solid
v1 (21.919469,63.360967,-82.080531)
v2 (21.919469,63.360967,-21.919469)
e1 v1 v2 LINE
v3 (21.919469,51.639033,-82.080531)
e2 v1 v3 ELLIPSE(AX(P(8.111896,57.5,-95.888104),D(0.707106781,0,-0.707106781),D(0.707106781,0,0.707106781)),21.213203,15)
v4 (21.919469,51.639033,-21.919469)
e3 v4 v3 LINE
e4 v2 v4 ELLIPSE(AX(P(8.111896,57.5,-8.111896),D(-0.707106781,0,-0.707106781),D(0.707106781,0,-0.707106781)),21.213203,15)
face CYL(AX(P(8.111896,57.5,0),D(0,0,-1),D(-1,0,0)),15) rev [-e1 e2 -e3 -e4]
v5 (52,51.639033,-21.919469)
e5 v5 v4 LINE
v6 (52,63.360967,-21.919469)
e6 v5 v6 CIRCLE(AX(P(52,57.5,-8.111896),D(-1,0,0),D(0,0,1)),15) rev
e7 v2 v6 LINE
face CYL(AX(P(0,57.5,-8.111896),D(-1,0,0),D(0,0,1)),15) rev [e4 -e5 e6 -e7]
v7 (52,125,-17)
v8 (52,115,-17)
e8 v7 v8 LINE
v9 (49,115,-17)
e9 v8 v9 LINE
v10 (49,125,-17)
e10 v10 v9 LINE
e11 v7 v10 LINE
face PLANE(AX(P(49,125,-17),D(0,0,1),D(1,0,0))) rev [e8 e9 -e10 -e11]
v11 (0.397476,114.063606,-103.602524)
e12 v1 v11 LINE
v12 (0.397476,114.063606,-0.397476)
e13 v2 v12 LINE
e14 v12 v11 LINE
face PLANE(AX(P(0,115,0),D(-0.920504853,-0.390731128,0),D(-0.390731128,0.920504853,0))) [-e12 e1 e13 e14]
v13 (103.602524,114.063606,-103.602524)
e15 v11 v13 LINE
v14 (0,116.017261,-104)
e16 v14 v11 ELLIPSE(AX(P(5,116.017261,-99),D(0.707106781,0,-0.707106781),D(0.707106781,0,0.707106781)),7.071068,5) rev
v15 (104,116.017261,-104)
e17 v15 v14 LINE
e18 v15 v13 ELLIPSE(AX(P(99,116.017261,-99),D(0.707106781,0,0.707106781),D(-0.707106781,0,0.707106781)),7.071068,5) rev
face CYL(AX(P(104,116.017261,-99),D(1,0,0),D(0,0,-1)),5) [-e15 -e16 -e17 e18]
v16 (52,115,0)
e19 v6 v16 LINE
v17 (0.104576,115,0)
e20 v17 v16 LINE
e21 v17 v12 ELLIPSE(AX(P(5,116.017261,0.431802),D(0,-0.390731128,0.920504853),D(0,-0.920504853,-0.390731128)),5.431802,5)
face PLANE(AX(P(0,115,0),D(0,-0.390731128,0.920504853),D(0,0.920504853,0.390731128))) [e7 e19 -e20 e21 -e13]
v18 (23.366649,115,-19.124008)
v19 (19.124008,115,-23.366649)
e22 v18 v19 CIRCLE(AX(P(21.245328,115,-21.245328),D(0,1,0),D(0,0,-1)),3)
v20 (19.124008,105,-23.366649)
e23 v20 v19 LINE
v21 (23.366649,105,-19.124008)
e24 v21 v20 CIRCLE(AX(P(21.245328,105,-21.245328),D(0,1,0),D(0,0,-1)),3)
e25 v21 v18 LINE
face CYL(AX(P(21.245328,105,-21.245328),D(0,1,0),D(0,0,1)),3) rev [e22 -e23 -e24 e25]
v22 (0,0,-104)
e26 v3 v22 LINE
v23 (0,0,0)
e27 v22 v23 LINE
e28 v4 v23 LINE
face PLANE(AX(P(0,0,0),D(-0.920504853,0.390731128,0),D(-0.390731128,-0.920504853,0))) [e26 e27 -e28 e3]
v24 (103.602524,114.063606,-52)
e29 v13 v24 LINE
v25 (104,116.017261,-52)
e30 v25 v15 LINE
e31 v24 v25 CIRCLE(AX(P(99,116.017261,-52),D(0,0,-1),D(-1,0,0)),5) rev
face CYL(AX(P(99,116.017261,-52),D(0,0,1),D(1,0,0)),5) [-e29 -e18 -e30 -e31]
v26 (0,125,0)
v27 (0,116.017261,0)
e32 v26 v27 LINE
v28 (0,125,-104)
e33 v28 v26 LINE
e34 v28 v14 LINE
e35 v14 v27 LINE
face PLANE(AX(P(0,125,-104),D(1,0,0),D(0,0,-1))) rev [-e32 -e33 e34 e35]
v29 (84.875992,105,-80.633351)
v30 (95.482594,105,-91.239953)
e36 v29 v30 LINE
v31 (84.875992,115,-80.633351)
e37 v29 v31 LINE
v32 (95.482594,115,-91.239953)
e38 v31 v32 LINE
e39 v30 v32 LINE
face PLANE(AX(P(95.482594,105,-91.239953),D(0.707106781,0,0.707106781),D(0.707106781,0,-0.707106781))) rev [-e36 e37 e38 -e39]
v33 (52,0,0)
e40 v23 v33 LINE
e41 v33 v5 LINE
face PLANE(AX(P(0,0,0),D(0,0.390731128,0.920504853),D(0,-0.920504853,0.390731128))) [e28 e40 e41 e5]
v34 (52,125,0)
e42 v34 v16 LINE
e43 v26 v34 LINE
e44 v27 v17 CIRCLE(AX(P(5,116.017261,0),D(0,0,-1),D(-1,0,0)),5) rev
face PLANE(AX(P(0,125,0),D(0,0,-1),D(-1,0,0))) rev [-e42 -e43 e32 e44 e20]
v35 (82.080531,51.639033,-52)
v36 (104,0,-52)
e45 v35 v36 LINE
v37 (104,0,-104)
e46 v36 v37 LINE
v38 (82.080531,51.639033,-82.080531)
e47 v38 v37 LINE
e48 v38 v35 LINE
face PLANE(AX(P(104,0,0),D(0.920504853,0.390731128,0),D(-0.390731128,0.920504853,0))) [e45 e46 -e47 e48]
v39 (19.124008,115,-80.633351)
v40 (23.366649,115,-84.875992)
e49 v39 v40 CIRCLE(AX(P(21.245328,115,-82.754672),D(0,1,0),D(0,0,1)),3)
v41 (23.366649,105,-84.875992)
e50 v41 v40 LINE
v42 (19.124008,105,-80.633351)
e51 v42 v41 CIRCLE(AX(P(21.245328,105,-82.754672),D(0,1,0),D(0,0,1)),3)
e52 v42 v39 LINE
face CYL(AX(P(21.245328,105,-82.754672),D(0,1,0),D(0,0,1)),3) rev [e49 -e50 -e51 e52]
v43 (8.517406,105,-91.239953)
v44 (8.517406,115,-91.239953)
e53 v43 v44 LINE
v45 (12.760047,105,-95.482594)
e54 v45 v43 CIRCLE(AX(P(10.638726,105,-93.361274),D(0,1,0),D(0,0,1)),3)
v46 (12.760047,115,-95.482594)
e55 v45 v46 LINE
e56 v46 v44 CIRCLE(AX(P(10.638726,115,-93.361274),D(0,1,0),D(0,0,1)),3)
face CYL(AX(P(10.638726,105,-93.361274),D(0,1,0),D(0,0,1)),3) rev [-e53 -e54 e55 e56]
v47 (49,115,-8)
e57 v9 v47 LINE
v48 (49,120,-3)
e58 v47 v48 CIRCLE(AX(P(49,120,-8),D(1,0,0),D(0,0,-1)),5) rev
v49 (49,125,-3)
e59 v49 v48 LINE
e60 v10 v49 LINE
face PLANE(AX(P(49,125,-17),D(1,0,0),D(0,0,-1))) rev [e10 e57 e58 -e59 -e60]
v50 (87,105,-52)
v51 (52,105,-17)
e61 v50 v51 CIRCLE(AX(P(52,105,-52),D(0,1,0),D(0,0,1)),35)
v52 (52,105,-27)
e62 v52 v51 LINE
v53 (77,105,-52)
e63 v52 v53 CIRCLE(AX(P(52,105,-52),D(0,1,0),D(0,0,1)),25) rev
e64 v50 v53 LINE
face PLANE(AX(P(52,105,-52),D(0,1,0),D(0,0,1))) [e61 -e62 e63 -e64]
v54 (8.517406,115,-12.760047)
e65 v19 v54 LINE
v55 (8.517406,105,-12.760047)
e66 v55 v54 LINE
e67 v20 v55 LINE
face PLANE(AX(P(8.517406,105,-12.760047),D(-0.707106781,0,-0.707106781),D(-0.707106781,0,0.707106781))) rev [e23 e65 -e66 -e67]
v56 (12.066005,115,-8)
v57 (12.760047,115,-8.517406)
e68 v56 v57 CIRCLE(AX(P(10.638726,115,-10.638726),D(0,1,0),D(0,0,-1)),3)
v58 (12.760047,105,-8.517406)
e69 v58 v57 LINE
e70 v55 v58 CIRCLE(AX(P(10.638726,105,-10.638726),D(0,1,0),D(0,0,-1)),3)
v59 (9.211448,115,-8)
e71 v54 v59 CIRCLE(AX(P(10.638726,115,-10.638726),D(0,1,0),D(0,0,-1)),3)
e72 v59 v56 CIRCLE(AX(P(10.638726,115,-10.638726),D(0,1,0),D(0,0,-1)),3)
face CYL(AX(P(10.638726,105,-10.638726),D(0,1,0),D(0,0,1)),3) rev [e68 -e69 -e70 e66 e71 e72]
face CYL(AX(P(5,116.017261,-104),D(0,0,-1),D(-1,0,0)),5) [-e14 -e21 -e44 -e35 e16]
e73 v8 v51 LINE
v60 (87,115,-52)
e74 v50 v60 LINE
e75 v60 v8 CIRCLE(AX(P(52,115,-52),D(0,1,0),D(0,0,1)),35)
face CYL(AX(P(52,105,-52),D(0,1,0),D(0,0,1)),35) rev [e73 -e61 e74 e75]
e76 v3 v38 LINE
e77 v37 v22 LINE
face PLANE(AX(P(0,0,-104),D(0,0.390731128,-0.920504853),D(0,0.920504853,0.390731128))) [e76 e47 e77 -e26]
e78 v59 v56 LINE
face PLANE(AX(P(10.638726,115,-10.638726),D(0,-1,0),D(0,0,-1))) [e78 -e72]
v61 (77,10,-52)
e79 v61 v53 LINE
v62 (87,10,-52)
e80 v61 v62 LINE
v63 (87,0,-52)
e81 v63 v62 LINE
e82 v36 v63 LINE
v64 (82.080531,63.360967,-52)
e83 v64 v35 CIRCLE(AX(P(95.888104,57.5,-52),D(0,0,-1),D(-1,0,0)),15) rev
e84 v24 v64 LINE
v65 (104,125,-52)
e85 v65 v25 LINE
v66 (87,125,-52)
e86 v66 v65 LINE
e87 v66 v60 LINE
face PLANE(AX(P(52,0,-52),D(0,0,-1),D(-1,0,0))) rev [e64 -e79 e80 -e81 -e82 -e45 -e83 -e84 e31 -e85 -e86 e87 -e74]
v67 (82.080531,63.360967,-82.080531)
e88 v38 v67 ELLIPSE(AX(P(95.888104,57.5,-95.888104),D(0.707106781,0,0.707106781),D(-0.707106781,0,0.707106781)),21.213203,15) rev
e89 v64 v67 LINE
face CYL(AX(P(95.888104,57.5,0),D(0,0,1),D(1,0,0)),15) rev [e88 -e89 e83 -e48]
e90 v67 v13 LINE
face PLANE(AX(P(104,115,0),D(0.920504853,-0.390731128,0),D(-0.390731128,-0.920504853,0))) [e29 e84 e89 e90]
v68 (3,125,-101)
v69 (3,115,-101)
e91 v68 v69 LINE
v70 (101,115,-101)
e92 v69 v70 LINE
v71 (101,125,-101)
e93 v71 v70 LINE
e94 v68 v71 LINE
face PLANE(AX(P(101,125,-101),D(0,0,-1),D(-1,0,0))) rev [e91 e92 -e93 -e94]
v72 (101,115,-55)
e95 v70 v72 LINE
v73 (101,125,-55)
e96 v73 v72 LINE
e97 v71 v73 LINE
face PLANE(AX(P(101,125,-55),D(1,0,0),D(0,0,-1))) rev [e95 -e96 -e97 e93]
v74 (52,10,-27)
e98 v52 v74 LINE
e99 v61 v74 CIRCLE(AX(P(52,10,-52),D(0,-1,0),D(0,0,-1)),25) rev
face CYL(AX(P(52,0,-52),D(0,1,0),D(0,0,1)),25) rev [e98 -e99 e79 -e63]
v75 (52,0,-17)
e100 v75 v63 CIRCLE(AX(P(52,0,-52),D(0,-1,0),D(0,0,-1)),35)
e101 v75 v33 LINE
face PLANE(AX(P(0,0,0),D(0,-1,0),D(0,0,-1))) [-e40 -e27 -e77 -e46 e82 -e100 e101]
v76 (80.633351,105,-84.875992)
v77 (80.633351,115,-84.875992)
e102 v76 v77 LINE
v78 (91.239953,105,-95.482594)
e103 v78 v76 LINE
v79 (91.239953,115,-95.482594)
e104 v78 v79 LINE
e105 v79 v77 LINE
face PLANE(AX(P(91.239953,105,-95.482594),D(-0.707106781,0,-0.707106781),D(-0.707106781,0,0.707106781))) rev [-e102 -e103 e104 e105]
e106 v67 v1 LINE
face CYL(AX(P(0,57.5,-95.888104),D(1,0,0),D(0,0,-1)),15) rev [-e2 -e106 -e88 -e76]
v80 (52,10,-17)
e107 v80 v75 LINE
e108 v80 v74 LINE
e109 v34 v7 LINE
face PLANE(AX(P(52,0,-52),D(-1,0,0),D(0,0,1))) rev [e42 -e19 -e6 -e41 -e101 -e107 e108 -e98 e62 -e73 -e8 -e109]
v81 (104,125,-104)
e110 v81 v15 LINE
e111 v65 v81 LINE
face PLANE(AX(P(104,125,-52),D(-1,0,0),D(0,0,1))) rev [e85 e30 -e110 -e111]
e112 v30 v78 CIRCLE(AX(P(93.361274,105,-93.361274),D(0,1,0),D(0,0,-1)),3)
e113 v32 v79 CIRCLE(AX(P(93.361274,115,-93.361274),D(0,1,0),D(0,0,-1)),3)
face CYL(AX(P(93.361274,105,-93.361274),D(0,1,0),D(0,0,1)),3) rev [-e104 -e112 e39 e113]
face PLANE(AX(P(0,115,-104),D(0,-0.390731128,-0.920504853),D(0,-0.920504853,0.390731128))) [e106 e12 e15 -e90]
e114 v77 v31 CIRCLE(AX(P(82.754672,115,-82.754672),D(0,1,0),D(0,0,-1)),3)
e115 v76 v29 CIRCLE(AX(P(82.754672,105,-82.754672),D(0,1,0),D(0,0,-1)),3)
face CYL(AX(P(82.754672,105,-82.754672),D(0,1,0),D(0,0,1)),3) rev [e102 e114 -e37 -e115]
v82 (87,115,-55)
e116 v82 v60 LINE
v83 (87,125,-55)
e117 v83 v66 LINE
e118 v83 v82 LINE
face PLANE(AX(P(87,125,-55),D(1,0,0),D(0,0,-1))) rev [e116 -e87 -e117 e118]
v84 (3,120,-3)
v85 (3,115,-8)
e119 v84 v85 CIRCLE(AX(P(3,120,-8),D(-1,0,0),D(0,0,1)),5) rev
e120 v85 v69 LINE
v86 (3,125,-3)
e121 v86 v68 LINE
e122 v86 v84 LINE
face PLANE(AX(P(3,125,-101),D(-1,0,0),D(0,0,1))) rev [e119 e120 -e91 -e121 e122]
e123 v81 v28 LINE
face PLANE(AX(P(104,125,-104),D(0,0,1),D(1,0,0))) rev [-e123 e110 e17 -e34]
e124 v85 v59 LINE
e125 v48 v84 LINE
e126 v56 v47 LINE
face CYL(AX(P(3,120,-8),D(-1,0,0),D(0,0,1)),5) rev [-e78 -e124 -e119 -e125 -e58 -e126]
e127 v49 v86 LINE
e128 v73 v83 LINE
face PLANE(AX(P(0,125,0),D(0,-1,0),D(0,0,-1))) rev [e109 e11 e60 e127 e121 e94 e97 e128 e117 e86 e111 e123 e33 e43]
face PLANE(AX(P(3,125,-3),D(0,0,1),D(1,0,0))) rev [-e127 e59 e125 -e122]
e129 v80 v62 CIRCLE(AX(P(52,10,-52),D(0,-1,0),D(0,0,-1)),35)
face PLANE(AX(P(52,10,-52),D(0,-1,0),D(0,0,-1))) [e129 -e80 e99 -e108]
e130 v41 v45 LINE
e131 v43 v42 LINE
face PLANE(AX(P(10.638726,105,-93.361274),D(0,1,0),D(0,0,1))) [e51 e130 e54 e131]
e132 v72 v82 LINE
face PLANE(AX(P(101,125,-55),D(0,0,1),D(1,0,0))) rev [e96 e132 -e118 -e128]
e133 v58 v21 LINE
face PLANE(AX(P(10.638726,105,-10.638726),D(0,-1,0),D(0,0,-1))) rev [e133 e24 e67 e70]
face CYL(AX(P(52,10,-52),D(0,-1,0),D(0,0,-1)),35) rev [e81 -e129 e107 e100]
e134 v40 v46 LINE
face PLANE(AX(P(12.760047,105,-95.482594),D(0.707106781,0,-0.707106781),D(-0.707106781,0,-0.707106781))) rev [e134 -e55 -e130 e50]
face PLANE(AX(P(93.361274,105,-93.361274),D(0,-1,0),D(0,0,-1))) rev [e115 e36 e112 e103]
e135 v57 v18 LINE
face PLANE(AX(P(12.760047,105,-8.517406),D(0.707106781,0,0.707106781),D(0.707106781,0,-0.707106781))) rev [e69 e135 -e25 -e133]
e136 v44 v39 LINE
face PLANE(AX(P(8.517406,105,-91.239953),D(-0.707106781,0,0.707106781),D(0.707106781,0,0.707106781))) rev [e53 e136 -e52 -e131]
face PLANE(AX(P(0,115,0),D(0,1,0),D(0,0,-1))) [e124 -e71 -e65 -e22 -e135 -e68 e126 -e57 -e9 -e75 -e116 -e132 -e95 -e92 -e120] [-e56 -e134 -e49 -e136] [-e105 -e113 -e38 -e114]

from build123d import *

# Parameters (mm, degrees)
SKETCH1_W           = 104
SKETCH1_H           = 104
BOSS_EXTRUDE1_DEPTH = 57.5
BOSS_EXTRUDE1_TAPER = 23
SKETCH2_R           = 25
CUT_EXTRUDE1_DEPTH  = 187.700294763
FILLET1_R           = 15
SKETCH3_R           = 35
CUT_EXTRUDE2_DEPTH  = 10
CUT_EXTRUDE3_START  = -10
SKETCH5_R           = 35
CUT_EXTRUDE3_DEPTH  = 10
SKETCH6_W           = 52
SKETCH6_H           = 52
CUT_EXTRUDE4_DEPTH  = 187.700294763
BOSS_EXTRUDE2_DEPTH = 10
FILLET2_R           = 5
CUT_EXTRUDE5_DEPTH  = 10


with BuildPart() as part:
    # Sketch1 → Boss-Extrude1 (new body)
    with BuildSketch(Plane(origin=(0, 0, 0), x_dir=(1, 0, 0), z_dir=(0, 1, 0))):
        with Locations((52, 52)):
            Rectangle(SKETCH1_W, SKETCH1_H)
    extrude(amount=BOSS_EXTRUDE1_DEPTH, taper=BOSS_EXTRUDE1_TAPER)

    # Mirror1: part across plane


with BuildPart() as part_1:
    add(part.part)
    add(part.part.mirror(Plane(origin=(0, 57.5, 0), x_dir=(0, 0, 1), z_dir=(0, -1, 0))))

    # Sketch2 → Cut-Extrude1 (cut, through all)
    with BuildSketch(Plane(origin=(0, 115, 0), x_dir=(1, 0, 0), z_dir=(0, 1, 0))):
        with Locations(Location((52, 52, 0), (0, 0, 270))):
            Circle(SKETCH2_R)
    extrude(amount=-CUT_EXTRUDE1_DEPTH, mode=Mode.SUBTRACT)

    # Fillet1
    # the kernel refuses this fillet: 15 mm, written as the material it adds along each edge
    with BuildSketch(Plane(origin=(24.407301932, 57.5, -95.510503676), x_dir=(-0.39073112848927455, -0.9205048534524399, 0), z_dir=(0, 0, 1))) as fillet1_piece_1_section:
        with BuildLine():
            CenterArc((FILLET1_R * 0.42447481621, -FILLET1_R), FILLET1_R, 90, 46)
            Line((-FILLET1_R * 0.294864984129, -FILLET1_R * 0.305341629541), (0, 0))
            Line((0, 0), (FILLET1_R * 0.42447481621, 0))
        make_face()
    fillet1_piece_1 = extrude(amount=87.021007352, mode=Mode.PRIVATE)
    fillet1_piece_1 = fillet1_piece_1 - Plane(origin=(24.407301932, 57.5, -8.111896271), x_dir=(0, -0.39073112848927466, -0.9205048534524399), z_dir=(-1, 0, 0)) * Cylinder(15, 200, mode=Mode.PRIVATE)
    fillet1_piece_1 = fillet1_piece_1 - Plane(origin=(24.407301932, 57.5, -95.888103729), x_dir=(0, -0.3907311284892748, 0.9205048534524398), z_dir=(1, 0, 0)) * Cylinder(15, 200, mode=Mode.PRIVATE)
    add(fillet1_piece_1)
    with BuildSketch(Plane(origin=(8.489496324, 57.5, -24.407301932), x_dir=(0, -0.9205048534524399, 0.39073112848927455), z_dir=(1, 0, 0))) as fillet1_piece_2_section:
        with BuildLine():
            CenterArc((FILLET1_R * 0.42447481621, -FILLET1_R), FILLET1_R, 90, 46)
            Line((-FILLET1_R * 0.294864984129, -FILLET1_R * 0.305341629541), (0, 0))
            Line((0, 0), (FILLET1_R * 0.42447481621, 0))
        make_face()
    fillet1_piece_2 = extrude(amount=87.021007352, mode=Mode.PRIVATE)
    fillet1_piece_2 = fillet1_piece_2 - Plane(origin=(95.888103729, 57.5, -24.407301932), x_dir=(-0.9205048534524398, -0.3907311284892748, 0), z_dir=(0, 0, 1)) * Cylinder(15, 200, mode=Mode.PRIVATE)
    fillet1_piece_2 = fillet1_piece_2 - Plane(origin=(8.111896271, 57.5, -24.407301932), x_dir=(0.9205048534524399, -0.39073112848927466, 0), z_dir=(0, 0, -1)) * Cylinder(15, 200, mode=Mode.PRIVATE)
    add(fillet1_piece_2)
    with BuildSketch(Plane(origin=(79.592698068, 57.5, -8.489496324), x_dir=(0.39073112848927455, -0.9205048534524399, 0), z_dir=(0, 0, -1))) as fillet1_piece_3_section:
        with BuildLine():
            CenterArc((FILLET1_R * 0.42447481621, -FILLET1_R), FILLET1_R, 90, 46)
            Line((-FILLET1_R * 0.294864984129, -FILLET1_R * 0.305341629541), (0, 0))
            Line((0, 0), (FILLET1_R * 0.42447481621, 0))
        make_face()
    fillet1_piece_3 = extrude(amount=87.021007352, mode=Mode.PRIVATE)
    fillet1_piece_3 = fillet1_piece_3 - Plane(origin=(79.592698068, 57.5, -8.111896271), x_dir=(0, -0.39073112848927466, -0.9205048534524399), z_dir=(-1, 0, 0)) * Cylinder(15, 200, mode=Mode.PRIVATE)
    fillet1_piece_3 = fillet1_piece_3 - Plane(origin=(79.592698068, 57.5, -95.888103729), x_dir=(0, -0.3907311284892748, 0.9205048534524398), z_dir=(1, 0, 0)) * Cylinder(15, 200, mode=Mode.PRIVATE)
    add(fillet1_piece_3)
    with BuildSketch(Plane(origin=(95.510503676, 57.5, -79.592698068), x_dir=(0, -0.9205048534524399, -0.39073112848927455), z_dir=(-1, 0, 0))) as fillet1_piece_4_section:
        with BuildLine():
            CenterArc((FILLET1_R * 0.42447481621, -FILLET1_R), FILLET1_R, 90, 46)
            Line((-FILLET1_R * 0.294864984129, -FILLET1_R * 0.305341629541), (0, 0))
            Line((0, 0), (FILLET1_R * 0.42447481621, 0))
        make_face()
    fillet1_piece_4 = extrude(amount=87.021007352, mode=Mode.PRIVATE)
    fillet1_piece_4 = fillet1_piece_4 - Plane(origin=(95.888103729, 57.5, -79.592698068), x_dir=(-0.9205048534524398, -0.3907311284892748, 0), z_dir=(0, 0, 1)) * Cylinder(15, 200, mode=Mode.PRIVATE)
    fillet1_piece_4 = fillet1_piece_4 - Plane(origin=(8.111896271, 57.5, -79.592698068), x_dir=(0.9205048534524399, -0.39073112848927466, 0), z_dir=(0, 0, -1)) * Cylinder(15, 200, mode=Mode.PRIVATE)
    add(fillet1_piece_4)

    # Sketch3 → Cut-Extrude2 (cut)
    with BuildSketch(Plane(origin=(0, 115, 0), x_dir=(1, 0, 0), z_dir=(0, 1, 0))):
        with Locations(Location((52, 52, 0), (0, 0, 270))):
            Circle(SKETCH3_R)
    extrude(amount=-CUT_EXTRUDE2_DEPTH, mode=Mode.SUBTRACT)

    # Sketch5 → Cut-Extrude3 (cut)
    with BuildSketch(Plane.XZ.offset(CUT_EXTRUDE3_START)):
        with Locations(Location((52, -52, 0), (0, 0, 90))):
            Circle(SKETCH5_R)
    extrude(amount=CUT_EXTRUDE3_DEPTH, mode=Mode.SUBTRACT)

    # Sketch6 → Cut-Extrude4 (cut, through all)
    with BuildSketch(Plane(origin=(0, 115, 0), x_dir=(1, 0, 0), z_dir=(0, 1, 0))):
        with Locations((78, 26)):
            Rectangle(SKETCH6_W, SKETCH6_H)
    extrude(amount=-CUT_EXTRUDE4_DEPTH, mode=Mode.SUBTRACT)

    # Sketch7 → Boss-Extrude2 (add)
    with BuildSketch(Plane(origin=(0, 115, 0), x_dir=(1, 0, 0), z_dir=(0, 1, 0))):
        Polygon((52, 17), (52, 0), (0, 0), (0, 104), (104, 104), (104, 52), (87, 52), (87, 55), (101, 55), (101, 101), (3, 101), (3, 3), (49, 3), (49, 17), align=None)
    extrude(amount=BOSS_EXTRUDE2_DEPTH)

    # Fillet2
    fillet2_edges = [part_1.edges().sort_by_distance(p)[0] for p in [
        (26, 115, -3),
        (0, 115, -52),
        (52, 115, -104),
        (104, 115, -78),
    ]]
    fillet(fillet2_edges, radius=FILLET2_R)

    # Sketch8 → Cut-Extrude5 (cut)
    with BuildSketch(Plane(origin=(0, 115, 0), x_dir=(1, 0, 0), z_dir=(0, 1, 0))):
        with BuildLine():
            Line((12.760046787, 95.4825939), (23.366648505, 84.875992182))
            ThreePointArc((23.366648505, 84.875992182), (23.366648505, 80.633351495), (19.124007818, 80.633351495))
            Line((19.124007818, 80.633351495), (8.5174061, 91.239953213))
            ThreePointArc((8.5174061, 91.239953213), (8.5174061, 95.4825939), (12.760046787, 95.4825939))
        make_face()
        with BuildLine():
            Line((12.760046787, 8.5174061), (23.366648505, 19.124007818))
            ThreePointArc((23.366648505, 19.124007818), (23.366648505, 23.366648505), (19.124007818, 23.366648505))
            Line((19.124007818, 23.366648505), (8.5174061, 12.760046787))
            ThreePointArc((8.5174061, 12.760046787), (8.5174061, 8.5174061), (12.760046787, 8.5174061))
        make_face()
        with BuildLine():
            Line((91.239953213, 95.4825939), (80.633351495, 84.875992182))
            ThreePointArc((80.633351495, 84.875992182), (80.633351495, 80.633351495), (84.875992182, 80.633351495))
            Line((84.875992182, 80.633351495), (95.4825939, 91.239953213))
            ThreePointArc((95.4825939, 91.239953213), (95.4825939, 95.4825939), (91.239953213, 95.4825939))
        make_face()
    extrude(amount=-CUT_EXTRUDE5_DEPTH, mode=Mode.SUBTRACT)


solid = part_1.part
